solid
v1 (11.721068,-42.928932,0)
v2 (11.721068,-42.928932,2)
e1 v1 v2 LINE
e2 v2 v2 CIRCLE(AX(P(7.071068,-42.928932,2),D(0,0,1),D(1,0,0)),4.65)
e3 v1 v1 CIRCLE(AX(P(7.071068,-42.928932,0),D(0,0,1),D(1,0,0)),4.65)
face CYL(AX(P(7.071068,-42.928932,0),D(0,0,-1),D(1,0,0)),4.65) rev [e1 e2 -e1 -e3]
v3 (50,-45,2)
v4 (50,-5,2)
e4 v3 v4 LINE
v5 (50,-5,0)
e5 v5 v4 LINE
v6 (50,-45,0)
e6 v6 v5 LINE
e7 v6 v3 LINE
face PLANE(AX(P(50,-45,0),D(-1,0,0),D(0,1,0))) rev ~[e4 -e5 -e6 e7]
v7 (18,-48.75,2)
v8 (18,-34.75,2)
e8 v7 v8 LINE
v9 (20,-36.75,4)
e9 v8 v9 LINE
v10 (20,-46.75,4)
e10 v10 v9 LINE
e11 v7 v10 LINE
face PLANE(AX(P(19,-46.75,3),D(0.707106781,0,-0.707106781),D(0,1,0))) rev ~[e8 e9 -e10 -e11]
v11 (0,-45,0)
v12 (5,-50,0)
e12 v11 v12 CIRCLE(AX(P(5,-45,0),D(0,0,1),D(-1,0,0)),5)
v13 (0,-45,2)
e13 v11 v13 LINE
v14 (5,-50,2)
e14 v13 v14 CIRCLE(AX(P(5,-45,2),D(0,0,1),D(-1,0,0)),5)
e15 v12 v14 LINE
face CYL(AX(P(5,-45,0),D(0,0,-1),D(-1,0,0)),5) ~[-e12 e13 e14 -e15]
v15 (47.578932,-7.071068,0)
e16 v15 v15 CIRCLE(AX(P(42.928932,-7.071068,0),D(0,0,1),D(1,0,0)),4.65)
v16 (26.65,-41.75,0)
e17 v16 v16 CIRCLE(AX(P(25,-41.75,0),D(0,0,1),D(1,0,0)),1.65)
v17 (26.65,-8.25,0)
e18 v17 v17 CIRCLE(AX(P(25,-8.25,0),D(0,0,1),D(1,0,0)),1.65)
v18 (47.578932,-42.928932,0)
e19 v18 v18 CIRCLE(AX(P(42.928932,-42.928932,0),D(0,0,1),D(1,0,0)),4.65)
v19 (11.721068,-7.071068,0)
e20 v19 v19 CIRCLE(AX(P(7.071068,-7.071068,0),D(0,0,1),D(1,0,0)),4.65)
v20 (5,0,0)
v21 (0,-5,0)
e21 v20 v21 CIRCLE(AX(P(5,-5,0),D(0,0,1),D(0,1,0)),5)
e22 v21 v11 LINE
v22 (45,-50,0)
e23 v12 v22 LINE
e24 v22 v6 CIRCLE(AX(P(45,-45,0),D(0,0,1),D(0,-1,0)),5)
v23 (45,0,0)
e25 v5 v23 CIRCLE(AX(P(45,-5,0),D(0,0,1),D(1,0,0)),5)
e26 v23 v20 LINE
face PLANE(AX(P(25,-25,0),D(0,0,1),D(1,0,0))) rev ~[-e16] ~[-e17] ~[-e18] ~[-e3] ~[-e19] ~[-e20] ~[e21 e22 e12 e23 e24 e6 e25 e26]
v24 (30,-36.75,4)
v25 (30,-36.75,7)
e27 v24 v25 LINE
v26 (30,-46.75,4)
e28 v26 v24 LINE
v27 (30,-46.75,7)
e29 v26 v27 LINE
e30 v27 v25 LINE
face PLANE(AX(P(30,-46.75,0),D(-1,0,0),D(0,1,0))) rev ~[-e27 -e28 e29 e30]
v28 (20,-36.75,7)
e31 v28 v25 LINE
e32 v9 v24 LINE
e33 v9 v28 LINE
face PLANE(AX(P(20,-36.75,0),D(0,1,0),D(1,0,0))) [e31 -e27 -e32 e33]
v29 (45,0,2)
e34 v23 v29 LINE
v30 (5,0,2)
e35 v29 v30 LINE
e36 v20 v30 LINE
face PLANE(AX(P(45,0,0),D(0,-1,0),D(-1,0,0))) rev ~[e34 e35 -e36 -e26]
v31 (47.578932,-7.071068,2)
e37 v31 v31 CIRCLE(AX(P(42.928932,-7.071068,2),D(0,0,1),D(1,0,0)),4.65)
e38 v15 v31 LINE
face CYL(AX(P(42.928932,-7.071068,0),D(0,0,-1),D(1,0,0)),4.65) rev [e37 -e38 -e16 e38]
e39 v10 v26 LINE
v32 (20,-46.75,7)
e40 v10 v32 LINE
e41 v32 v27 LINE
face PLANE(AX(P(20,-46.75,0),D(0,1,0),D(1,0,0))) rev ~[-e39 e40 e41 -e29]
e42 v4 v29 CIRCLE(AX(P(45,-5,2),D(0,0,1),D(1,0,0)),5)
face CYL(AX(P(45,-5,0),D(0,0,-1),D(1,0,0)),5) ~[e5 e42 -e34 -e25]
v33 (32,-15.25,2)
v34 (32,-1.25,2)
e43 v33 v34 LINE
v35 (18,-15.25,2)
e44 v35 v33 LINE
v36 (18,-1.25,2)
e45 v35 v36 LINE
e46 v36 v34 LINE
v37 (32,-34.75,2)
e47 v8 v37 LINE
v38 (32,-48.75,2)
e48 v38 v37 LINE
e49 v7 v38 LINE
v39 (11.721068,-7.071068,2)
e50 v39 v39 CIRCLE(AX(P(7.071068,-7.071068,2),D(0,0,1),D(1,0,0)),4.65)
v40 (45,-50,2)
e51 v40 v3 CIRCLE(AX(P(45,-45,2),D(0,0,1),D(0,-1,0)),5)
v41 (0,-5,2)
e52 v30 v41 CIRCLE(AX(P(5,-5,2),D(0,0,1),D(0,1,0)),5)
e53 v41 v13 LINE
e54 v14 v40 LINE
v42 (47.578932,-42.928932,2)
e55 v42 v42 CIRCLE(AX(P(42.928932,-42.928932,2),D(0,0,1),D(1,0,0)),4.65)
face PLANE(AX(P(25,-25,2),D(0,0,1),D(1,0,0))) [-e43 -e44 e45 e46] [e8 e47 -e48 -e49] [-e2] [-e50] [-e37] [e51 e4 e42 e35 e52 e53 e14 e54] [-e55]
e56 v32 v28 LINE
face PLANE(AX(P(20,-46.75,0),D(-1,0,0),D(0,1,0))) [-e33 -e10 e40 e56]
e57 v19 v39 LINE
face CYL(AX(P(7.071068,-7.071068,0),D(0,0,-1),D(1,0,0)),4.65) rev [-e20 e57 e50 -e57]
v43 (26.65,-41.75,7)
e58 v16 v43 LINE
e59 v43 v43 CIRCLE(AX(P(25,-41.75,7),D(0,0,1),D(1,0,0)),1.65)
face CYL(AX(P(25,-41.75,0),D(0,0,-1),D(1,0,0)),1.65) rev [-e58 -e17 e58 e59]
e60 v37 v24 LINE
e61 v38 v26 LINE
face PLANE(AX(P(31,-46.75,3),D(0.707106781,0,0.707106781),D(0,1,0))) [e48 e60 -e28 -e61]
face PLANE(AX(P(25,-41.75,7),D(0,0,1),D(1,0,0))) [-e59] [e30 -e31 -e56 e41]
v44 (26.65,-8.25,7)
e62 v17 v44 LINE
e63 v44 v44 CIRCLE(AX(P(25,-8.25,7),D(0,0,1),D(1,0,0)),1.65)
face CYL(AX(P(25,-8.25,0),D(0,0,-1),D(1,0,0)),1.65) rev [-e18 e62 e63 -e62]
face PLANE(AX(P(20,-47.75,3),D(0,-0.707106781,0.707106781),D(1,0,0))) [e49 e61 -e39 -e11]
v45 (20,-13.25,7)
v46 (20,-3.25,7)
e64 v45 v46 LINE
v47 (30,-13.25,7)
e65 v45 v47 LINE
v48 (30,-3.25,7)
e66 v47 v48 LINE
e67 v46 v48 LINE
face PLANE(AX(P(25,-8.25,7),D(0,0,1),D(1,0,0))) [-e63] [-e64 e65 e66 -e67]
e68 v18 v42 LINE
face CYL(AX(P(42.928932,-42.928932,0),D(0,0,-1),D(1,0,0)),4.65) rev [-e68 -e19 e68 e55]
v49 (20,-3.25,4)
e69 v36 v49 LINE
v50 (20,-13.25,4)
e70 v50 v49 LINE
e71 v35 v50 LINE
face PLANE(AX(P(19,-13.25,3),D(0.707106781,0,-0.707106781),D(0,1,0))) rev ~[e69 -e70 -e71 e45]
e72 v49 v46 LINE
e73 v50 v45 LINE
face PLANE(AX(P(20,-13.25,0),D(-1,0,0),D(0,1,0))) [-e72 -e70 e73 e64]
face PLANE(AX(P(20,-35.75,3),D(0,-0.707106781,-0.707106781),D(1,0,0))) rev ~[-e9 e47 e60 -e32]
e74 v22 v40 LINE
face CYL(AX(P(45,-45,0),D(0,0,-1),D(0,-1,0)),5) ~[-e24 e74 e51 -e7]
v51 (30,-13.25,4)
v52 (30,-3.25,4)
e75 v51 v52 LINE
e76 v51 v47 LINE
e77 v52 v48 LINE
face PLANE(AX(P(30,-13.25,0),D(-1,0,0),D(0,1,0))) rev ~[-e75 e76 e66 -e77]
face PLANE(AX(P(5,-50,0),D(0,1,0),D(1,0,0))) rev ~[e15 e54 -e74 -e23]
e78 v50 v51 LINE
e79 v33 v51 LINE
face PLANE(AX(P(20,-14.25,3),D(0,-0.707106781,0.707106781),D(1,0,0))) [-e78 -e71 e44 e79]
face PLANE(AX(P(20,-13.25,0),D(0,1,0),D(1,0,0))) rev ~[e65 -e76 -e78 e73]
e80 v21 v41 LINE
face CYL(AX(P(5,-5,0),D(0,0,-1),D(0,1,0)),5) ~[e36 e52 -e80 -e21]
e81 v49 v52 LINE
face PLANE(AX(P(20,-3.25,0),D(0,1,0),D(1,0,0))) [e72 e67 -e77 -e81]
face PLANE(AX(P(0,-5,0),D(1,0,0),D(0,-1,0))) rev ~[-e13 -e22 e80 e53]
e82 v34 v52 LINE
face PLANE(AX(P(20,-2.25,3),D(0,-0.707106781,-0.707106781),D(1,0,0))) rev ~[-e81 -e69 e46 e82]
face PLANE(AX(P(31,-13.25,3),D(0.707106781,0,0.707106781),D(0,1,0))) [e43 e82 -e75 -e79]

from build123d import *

# Parameters (mm, degrees)
F0_W     = 10
F0_H     = 10
F0_R     = 1.65
F1_DEPTH = 7
F0_R_2   = 4.65
F2_DEPTH = 2
F3_SIZE  = 2


with BuildPart() as f1:
    # F0 (on Top) → F1 (new body)
    with BuildSketch(Plane.XY):
        with Locations((25, -41.75)):
            Rectangle(F0_W, F0_H)
        with Locations((25, -41.75)):
            Circle(F0_R, mode=Mode.SUBTRACT)
    extrude(amount=F1_DEPTH)



with BuildPart() as f1b:
    # F0 (on Top) → F1, piece 2 (new body)
    with BuildSketch(Plane.XY):
        with Locations((25, -8.25)):
            Rectangle(F0_W, F0_H)
        with Locations((25, -8.25)):
            Circle(F0_R, mode=Mode.SUBTRACT)
    extrude(amount=F1_DEPTH)


with BuildPart() as f1_1:
    add(f1.part)

    add(f1b.part)  # F2 merges F1b
    # F0 (on Top) → F2 (join)
    with BuildSketch(Plane.XY):
        with BuildLine():
            Line((45, 0), (5, 0))
            ThreePointArc((5, 0), (1.4644660941, -1.4644660941), (0, -5))
            Line((0, -5), (0, -45))
            ThreePointArc((0, -45), (1.4644660941, -48.5355339059), (5, -50))
            Line((5, -50), (45, -50))
            ThreePointArc((45, -50), (48.5355339059, -48.5355339059), (50, -45))
            Line((50, -45), (50, -5))
            ThreePointArc((50, -5), (48.5355339059, -1.4644660941), (45, 0))
        make_face()
        with Locations((7.0710678119, -42.9289321881)):
            Circle(F0_R_2, mode=Mode.SUBTRACT)
        with Locations((25, -41.75)):
            Rectangle(F0_W, F0_H, mode=Mode.SUBTRACT)
        with Locations((42.9289321881, -42.9289321881)):
            Circle(F0_R_2, mode=Mode.SUBTRACT)
        with Locations((7.0710678119, -7.0710678119)):
            Circle(F0_R_2, mode=Mode.SUBTRACT)
        with Locations((25, -8.25)):
            Rectangle(F0_W, F0_H, mode=Mode.SUBTRACT)
        with Locations((42.9289321881, -7.0710678119)):
            Circle(F0_R_2, mode=Mode.SUBTRACT)
    extrude(amount=F2_DEPTH)

    # F3
    f3_edges = [f1_1.edges().sort_by_distance(p)[0] for p in [
        (25, -46.75, 2),
        (30, -8.25, 2),
        (30, -41.75, 2),
        (25, -13.25, 2),
        (25, -3.25, 2),
        (25, -36.75, 2),
        (20, -8.25, 2),
        (20, -41.75, 2),
    ]]
    chamfer(f3_edges, length=F3_SIZE)


solid = f1_1.part
